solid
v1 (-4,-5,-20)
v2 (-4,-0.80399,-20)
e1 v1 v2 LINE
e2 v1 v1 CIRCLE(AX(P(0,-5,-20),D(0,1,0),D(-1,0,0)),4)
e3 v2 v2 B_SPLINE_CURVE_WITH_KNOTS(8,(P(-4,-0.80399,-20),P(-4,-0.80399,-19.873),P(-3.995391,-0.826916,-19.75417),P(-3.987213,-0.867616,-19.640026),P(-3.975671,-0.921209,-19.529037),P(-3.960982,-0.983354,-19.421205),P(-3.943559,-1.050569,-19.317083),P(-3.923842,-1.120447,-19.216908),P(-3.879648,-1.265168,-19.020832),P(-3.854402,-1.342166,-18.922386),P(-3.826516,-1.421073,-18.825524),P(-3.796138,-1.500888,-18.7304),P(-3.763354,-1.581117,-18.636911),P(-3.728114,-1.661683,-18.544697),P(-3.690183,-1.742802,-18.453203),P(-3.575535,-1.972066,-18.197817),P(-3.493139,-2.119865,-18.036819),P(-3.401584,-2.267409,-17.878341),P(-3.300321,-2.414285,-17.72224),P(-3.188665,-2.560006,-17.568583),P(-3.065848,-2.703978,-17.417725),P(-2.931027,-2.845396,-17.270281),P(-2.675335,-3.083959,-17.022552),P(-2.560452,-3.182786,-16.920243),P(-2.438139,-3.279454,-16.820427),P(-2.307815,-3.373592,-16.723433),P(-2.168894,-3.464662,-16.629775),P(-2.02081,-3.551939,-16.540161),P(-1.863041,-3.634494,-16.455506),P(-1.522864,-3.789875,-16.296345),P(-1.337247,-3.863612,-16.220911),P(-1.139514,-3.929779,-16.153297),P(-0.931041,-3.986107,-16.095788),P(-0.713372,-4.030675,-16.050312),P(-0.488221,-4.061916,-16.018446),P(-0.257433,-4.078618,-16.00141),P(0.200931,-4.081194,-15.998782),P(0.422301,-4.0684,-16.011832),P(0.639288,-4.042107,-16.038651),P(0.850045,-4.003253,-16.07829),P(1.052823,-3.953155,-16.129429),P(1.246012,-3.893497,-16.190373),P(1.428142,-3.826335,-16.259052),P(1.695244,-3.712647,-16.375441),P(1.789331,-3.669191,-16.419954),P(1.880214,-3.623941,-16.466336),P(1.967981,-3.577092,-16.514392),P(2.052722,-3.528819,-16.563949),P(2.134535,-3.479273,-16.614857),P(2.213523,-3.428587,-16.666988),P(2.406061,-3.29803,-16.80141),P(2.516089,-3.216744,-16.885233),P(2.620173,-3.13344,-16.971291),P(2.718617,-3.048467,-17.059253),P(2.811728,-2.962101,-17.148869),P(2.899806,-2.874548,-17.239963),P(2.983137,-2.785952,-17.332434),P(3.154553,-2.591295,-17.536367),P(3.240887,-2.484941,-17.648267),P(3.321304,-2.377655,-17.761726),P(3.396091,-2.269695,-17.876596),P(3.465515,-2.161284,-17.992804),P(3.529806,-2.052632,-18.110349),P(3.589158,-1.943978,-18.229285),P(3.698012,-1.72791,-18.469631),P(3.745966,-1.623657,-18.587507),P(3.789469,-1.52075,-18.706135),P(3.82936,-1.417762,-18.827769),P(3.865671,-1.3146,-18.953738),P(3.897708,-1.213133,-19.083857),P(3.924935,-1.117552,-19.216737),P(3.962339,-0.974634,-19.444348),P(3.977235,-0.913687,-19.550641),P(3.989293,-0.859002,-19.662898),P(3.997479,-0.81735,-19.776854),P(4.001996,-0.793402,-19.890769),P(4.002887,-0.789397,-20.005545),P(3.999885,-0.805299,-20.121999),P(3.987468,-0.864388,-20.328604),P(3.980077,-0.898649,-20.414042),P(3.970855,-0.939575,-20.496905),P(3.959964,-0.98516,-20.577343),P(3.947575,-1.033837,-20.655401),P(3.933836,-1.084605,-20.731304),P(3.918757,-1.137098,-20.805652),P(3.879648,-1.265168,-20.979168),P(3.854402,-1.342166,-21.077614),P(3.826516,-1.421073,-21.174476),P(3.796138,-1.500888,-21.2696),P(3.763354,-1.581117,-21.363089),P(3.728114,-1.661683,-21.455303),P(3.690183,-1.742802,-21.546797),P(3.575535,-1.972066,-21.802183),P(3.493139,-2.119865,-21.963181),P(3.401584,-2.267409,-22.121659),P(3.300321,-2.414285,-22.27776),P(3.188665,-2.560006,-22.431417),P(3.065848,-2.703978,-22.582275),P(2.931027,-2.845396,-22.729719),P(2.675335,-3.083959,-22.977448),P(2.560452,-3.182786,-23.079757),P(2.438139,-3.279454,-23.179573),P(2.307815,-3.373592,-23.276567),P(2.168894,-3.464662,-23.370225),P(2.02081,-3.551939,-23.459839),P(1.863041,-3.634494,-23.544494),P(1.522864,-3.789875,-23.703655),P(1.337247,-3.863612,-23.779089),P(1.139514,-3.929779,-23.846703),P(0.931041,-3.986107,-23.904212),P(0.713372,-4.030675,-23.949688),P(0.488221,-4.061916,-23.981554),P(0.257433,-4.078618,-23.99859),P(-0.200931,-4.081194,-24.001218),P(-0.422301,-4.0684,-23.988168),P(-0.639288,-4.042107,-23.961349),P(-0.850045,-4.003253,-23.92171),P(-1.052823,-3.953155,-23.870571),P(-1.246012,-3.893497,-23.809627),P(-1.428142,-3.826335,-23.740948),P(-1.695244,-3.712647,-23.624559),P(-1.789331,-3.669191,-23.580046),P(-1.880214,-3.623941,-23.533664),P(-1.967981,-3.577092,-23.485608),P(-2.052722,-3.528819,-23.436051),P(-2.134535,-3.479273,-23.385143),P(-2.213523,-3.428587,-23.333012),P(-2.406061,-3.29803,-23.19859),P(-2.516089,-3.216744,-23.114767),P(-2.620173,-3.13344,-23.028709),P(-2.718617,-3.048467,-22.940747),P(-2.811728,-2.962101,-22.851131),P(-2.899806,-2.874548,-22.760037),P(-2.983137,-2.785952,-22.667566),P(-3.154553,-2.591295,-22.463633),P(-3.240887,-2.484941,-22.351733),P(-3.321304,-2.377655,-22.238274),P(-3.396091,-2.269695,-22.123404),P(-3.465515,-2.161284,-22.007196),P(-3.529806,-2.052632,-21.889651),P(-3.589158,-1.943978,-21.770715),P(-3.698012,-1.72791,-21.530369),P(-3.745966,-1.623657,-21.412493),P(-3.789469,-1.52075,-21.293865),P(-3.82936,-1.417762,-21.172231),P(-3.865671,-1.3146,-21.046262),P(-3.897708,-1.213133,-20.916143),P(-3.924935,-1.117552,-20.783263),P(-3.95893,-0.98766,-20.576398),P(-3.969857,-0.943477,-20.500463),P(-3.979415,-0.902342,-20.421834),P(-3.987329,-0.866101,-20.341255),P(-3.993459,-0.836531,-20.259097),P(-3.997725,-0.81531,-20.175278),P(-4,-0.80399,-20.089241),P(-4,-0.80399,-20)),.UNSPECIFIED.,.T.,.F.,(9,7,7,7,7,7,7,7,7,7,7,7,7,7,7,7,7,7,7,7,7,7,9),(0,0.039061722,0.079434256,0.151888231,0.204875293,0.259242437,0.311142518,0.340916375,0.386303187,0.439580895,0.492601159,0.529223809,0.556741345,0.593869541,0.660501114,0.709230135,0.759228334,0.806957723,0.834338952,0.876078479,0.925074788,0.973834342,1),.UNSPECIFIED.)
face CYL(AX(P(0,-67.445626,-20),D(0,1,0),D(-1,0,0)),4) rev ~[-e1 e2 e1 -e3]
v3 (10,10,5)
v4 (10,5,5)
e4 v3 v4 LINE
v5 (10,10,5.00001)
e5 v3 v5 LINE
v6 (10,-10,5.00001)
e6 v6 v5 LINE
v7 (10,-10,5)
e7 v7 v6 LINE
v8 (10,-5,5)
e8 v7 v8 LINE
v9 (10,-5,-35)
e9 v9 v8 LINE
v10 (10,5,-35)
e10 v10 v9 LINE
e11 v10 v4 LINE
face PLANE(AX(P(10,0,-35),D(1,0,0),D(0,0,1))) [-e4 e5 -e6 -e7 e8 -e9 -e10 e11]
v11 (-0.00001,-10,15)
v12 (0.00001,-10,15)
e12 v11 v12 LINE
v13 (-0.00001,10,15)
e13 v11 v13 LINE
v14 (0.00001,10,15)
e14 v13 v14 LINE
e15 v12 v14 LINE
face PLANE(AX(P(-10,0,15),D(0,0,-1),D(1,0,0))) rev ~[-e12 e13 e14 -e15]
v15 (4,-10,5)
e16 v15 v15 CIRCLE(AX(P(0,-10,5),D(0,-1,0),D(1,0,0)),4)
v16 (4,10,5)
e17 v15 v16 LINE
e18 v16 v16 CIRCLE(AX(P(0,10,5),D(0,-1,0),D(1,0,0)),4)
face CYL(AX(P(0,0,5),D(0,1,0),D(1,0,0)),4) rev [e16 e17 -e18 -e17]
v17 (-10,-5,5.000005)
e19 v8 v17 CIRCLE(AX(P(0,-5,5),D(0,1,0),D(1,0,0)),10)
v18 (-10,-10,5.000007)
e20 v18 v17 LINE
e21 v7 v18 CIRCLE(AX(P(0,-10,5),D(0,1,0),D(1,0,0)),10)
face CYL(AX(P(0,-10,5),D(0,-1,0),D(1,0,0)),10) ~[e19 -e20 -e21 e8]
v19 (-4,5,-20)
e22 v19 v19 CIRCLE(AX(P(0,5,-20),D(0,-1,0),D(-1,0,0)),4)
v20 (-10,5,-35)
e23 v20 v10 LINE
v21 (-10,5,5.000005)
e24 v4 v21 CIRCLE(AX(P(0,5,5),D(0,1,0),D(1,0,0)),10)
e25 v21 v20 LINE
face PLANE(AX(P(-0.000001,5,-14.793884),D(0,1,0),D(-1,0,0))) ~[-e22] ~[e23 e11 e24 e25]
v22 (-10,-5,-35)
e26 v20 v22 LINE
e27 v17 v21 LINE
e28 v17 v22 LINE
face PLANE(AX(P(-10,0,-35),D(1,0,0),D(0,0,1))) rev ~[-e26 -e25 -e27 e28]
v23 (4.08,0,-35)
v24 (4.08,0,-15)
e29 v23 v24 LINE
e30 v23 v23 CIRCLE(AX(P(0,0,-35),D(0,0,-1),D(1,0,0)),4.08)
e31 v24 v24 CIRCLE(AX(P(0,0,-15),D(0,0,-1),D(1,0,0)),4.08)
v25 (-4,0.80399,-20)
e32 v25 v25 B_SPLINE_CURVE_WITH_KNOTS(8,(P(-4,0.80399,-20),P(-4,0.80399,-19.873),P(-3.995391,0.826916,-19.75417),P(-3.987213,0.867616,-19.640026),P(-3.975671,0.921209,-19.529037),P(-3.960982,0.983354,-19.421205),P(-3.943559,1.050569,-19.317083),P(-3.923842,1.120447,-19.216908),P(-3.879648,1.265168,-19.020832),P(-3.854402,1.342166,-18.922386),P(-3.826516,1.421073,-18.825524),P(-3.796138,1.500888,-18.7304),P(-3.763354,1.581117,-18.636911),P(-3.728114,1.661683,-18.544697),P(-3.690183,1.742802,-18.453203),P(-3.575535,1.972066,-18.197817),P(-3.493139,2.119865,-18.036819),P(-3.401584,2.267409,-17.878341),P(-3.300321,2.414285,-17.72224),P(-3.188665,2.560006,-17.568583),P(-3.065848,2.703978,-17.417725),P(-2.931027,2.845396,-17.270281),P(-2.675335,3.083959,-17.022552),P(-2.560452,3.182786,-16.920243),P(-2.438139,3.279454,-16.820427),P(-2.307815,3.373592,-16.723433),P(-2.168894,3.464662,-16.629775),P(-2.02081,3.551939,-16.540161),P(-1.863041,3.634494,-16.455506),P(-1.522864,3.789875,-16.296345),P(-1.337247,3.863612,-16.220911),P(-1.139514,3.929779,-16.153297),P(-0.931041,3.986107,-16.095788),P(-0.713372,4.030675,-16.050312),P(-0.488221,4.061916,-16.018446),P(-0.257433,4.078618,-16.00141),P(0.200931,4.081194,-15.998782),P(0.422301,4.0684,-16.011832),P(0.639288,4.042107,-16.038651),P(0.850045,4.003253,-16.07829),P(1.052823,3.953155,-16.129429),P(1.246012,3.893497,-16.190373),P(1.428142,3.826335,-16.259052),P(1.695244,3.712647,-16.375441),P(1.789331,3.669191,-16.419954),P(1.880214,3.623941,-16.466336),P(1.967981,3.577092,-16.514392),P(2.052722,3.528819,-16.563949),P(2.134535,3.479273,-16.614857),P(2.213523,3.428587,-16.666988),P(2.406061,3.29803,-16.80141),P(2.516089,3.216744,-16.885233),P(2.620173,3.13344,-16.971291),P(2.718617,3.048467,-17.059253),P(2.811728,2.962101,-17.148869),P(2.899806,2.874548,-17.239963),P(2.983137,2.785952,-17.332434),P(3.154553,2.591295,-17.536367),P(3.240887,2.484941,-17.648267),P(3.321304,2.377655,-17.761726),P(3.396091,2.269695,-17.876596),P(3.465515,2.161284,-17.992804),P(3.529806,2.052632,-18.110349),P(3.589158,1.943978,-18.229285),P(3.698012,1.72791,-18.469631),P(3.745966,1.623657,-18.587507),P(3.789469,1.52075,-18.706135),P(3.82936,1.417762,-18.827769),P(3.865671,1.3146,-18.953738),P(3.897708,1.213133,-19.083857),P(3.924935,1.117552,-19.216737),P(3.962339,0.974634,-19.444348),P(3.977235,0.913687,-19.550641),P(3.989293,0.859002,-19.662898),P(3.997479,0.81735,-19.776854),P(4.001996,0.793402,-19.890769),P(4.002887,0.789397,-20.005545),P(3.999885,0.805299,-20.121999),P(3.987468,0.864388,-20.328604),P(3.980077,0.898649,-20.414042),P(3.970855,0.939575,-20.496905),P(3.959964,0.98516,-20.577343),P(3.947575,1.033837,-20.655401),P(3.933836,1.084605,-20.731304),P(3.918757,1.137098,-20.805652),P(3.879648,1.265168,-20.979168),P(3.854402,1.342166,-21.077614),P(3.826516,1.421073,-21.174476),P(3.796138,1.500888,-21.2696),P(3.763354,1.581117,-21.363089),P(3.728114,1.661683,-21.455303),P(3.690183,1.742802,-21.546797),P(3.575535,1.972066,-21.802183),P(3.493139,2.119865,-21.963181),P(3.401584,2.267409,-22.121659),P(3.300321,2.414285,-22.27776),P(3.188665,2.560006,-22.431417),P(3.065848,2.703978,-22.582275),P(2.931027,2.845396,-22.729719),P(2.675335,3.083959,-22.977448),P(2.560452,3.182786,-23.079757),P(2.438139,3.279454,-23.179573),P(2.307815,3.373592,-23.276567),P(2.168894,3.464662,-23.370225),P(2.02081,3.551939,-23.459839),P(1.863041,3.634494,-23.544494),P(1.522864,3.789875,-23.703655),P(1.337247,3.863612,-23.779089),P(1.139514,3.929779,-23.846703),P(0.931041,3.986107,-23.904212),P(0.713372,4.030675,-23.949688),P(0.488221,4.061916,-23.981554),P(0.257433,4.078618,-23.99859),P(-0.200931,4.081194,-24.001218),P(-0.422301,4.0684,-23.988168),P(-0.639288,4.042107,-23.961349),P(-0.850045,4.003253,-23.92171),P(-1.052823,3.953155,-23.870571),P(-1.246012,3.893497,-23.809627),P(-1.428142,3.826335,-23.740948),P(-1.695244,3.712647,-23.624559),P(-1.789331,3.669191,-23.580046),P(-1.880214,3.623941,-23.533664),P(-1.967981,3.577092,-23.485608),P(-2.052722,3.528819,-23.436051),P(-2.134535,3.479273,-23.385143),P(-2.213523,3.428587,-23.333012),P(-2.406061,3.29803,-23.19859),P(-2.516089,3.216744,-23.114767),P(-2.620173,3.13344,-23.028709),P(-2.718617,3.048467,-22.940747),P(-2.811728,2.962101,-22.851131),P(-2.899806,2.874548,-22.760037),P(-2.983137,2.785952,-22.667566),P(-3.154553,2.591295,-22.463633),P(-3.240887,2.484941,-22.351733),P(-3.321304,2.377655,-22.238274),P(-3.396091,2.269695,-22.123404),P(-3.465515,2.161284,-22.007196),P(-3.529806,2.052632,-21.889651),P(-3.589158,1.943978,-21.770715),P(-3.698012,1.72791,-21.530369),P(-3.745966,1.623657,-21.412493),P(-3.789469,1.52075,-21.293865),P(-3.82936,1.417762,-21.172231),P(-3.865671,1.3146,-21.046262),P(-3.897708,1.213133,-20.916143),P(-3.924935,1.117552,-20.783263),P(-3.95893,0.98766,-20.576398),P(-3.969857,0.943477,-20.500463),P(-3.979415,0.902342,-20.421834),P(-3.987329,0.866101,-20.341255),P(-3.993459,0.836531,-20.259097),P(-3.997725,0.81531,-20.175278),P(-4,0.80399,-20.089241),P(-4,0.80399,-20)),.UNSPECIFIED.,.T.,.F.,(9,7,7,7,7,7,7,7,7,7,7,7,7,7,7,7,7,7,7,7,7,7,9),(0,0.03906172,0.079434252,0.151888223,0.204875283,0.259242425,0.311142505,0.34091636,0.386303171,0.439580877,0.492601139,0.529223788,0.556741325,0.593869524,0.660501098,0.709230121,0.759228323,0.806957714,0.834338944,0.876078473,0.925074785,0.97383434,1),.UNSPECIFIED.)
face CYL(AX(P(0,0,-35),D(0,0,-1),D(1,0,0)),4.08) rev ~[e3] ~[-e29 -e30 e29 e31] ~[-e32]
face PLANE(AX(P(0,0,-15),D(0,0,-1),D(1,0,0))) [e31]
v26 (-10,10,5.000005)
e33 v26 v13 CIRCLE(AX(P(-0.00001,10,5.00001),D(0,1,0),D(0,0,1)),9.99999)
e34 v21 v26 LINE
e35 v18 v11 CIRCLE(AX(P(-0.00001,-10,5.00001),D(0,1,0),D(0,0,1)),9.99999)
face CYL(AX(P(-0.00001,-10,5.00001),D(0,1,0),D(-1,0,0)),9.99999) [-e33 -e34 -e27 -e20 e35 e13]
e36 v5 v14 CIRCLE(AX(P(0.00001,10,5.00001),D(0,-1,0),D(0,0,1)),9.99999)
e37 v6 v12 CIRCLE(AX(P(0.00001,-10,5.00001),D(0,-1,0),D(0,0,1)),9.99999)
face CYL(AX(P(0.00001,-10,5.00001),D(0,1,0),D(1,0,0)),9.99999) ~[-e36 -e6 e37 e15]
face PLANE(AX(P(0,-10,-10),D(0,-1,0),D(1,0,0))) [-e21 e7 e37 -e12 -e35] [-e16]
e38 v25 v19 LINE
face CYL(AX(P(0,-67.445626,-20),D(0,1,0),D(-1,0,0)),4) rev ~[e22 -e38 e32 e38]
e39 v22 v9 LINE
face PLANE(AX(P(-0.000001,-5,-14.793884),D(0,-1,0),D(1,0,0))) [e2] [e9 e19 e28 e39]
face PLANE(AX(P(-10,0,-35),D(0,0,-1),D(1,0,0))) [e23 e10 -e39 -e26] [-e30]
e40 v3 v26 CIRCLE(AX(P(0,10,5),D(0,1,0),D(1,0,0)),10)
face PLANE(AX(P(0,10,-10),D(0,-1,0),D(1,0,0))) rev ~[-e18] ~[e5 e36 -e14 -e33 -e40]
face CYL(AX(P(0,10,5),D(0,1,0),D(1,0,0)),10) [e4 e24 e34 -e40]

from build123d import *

# Parameters (mm, degrees)
F0_W          = 20
F0_H          = 50
F0_R          = 4
F1_DEPTH      = 10
F1_DEPTH_BACK = 10
F2_R          = 9.99999
F3_R          = 4.08
F4_DEPTH      = 20
F6_D          = 8
F7_R          = 4
F8_DEPTH      = 5


# Not quite as in the source:
# - a fillet or chamfer is up to 0.001 mm smaller than in the source, because OpenCascade refuses the exact size
# - ends of sketch curves that miss each other by under 0.0002 mm in the source are joined
# - a pattern or mirror of a feature is missing from the dataset's text; its kind, count and spacing are read off the source's solid


with BuildPart() as f1:
    # F0 (on Front) → F1 (new body, two sides)
    with BuildSketch(Plane.XZ) as f1_sk:
        with Locations((0, -10)):
            Rectangle(F0_W, F0_H)
        with Locations((0, 5)):
            Circle(F0_R, mode=Mode.SUBTRACT)
    extrude(amount=F1_DEPTH)
    extrude(f1_sk.sketch, amount=-F1_DEPTH_BACK)

    # F2 (radius 10 in the source; OpenCascade refuses exactly that, so slightly less here)
    f2_edges = [f1.edges().sort_by_distance(p)[0] for p in [
        (-10, 0, 15),
        (10, 0, 15),
    ]]
    fillet(f2_edges, radius=F2_R)

    # F3 (on face) → F4 (cut)
    with BuildSketch(Plane(origin=(0, 0, -35), x_dir=(1, 0, 0), z_dir=(0, 0, -1))):
        Circle(F3_R)
    extrude(amount=-F4_DEPTH, mode=Mode.SUBTRACT)

    # F6 (through all)
    with Locations(Plane.XZ.offset(10)):
        with Locations((0, -20)):
            Hole(F6_D / 2)

    # F7 (on face) → F8 (cut)
    with BuildSketch(Plane.XZ.offset(10)):
        with BuildLine():
            Line((10, -35), (10, 5))
            ThreePointArc((10, 5), (-2.5e-06, -5), (-10, 5.000005))
            Line((-10, 5.000005), (-10, -35))
            Line((-10, -35), (10, -35))
        make_face()
        with Locations((0, -20)):
            Circle(F7_R, mode=Mode.SUBTRACT)
    f8 = extrude(amount=-F8_DEPTH, mode=Mode.SUBTRACT)

    # F8_copies: F8 across plane
    add(f8.mirror(Plane.ZX), mode=Mode.SUBTRACT)


solid = f1.part
